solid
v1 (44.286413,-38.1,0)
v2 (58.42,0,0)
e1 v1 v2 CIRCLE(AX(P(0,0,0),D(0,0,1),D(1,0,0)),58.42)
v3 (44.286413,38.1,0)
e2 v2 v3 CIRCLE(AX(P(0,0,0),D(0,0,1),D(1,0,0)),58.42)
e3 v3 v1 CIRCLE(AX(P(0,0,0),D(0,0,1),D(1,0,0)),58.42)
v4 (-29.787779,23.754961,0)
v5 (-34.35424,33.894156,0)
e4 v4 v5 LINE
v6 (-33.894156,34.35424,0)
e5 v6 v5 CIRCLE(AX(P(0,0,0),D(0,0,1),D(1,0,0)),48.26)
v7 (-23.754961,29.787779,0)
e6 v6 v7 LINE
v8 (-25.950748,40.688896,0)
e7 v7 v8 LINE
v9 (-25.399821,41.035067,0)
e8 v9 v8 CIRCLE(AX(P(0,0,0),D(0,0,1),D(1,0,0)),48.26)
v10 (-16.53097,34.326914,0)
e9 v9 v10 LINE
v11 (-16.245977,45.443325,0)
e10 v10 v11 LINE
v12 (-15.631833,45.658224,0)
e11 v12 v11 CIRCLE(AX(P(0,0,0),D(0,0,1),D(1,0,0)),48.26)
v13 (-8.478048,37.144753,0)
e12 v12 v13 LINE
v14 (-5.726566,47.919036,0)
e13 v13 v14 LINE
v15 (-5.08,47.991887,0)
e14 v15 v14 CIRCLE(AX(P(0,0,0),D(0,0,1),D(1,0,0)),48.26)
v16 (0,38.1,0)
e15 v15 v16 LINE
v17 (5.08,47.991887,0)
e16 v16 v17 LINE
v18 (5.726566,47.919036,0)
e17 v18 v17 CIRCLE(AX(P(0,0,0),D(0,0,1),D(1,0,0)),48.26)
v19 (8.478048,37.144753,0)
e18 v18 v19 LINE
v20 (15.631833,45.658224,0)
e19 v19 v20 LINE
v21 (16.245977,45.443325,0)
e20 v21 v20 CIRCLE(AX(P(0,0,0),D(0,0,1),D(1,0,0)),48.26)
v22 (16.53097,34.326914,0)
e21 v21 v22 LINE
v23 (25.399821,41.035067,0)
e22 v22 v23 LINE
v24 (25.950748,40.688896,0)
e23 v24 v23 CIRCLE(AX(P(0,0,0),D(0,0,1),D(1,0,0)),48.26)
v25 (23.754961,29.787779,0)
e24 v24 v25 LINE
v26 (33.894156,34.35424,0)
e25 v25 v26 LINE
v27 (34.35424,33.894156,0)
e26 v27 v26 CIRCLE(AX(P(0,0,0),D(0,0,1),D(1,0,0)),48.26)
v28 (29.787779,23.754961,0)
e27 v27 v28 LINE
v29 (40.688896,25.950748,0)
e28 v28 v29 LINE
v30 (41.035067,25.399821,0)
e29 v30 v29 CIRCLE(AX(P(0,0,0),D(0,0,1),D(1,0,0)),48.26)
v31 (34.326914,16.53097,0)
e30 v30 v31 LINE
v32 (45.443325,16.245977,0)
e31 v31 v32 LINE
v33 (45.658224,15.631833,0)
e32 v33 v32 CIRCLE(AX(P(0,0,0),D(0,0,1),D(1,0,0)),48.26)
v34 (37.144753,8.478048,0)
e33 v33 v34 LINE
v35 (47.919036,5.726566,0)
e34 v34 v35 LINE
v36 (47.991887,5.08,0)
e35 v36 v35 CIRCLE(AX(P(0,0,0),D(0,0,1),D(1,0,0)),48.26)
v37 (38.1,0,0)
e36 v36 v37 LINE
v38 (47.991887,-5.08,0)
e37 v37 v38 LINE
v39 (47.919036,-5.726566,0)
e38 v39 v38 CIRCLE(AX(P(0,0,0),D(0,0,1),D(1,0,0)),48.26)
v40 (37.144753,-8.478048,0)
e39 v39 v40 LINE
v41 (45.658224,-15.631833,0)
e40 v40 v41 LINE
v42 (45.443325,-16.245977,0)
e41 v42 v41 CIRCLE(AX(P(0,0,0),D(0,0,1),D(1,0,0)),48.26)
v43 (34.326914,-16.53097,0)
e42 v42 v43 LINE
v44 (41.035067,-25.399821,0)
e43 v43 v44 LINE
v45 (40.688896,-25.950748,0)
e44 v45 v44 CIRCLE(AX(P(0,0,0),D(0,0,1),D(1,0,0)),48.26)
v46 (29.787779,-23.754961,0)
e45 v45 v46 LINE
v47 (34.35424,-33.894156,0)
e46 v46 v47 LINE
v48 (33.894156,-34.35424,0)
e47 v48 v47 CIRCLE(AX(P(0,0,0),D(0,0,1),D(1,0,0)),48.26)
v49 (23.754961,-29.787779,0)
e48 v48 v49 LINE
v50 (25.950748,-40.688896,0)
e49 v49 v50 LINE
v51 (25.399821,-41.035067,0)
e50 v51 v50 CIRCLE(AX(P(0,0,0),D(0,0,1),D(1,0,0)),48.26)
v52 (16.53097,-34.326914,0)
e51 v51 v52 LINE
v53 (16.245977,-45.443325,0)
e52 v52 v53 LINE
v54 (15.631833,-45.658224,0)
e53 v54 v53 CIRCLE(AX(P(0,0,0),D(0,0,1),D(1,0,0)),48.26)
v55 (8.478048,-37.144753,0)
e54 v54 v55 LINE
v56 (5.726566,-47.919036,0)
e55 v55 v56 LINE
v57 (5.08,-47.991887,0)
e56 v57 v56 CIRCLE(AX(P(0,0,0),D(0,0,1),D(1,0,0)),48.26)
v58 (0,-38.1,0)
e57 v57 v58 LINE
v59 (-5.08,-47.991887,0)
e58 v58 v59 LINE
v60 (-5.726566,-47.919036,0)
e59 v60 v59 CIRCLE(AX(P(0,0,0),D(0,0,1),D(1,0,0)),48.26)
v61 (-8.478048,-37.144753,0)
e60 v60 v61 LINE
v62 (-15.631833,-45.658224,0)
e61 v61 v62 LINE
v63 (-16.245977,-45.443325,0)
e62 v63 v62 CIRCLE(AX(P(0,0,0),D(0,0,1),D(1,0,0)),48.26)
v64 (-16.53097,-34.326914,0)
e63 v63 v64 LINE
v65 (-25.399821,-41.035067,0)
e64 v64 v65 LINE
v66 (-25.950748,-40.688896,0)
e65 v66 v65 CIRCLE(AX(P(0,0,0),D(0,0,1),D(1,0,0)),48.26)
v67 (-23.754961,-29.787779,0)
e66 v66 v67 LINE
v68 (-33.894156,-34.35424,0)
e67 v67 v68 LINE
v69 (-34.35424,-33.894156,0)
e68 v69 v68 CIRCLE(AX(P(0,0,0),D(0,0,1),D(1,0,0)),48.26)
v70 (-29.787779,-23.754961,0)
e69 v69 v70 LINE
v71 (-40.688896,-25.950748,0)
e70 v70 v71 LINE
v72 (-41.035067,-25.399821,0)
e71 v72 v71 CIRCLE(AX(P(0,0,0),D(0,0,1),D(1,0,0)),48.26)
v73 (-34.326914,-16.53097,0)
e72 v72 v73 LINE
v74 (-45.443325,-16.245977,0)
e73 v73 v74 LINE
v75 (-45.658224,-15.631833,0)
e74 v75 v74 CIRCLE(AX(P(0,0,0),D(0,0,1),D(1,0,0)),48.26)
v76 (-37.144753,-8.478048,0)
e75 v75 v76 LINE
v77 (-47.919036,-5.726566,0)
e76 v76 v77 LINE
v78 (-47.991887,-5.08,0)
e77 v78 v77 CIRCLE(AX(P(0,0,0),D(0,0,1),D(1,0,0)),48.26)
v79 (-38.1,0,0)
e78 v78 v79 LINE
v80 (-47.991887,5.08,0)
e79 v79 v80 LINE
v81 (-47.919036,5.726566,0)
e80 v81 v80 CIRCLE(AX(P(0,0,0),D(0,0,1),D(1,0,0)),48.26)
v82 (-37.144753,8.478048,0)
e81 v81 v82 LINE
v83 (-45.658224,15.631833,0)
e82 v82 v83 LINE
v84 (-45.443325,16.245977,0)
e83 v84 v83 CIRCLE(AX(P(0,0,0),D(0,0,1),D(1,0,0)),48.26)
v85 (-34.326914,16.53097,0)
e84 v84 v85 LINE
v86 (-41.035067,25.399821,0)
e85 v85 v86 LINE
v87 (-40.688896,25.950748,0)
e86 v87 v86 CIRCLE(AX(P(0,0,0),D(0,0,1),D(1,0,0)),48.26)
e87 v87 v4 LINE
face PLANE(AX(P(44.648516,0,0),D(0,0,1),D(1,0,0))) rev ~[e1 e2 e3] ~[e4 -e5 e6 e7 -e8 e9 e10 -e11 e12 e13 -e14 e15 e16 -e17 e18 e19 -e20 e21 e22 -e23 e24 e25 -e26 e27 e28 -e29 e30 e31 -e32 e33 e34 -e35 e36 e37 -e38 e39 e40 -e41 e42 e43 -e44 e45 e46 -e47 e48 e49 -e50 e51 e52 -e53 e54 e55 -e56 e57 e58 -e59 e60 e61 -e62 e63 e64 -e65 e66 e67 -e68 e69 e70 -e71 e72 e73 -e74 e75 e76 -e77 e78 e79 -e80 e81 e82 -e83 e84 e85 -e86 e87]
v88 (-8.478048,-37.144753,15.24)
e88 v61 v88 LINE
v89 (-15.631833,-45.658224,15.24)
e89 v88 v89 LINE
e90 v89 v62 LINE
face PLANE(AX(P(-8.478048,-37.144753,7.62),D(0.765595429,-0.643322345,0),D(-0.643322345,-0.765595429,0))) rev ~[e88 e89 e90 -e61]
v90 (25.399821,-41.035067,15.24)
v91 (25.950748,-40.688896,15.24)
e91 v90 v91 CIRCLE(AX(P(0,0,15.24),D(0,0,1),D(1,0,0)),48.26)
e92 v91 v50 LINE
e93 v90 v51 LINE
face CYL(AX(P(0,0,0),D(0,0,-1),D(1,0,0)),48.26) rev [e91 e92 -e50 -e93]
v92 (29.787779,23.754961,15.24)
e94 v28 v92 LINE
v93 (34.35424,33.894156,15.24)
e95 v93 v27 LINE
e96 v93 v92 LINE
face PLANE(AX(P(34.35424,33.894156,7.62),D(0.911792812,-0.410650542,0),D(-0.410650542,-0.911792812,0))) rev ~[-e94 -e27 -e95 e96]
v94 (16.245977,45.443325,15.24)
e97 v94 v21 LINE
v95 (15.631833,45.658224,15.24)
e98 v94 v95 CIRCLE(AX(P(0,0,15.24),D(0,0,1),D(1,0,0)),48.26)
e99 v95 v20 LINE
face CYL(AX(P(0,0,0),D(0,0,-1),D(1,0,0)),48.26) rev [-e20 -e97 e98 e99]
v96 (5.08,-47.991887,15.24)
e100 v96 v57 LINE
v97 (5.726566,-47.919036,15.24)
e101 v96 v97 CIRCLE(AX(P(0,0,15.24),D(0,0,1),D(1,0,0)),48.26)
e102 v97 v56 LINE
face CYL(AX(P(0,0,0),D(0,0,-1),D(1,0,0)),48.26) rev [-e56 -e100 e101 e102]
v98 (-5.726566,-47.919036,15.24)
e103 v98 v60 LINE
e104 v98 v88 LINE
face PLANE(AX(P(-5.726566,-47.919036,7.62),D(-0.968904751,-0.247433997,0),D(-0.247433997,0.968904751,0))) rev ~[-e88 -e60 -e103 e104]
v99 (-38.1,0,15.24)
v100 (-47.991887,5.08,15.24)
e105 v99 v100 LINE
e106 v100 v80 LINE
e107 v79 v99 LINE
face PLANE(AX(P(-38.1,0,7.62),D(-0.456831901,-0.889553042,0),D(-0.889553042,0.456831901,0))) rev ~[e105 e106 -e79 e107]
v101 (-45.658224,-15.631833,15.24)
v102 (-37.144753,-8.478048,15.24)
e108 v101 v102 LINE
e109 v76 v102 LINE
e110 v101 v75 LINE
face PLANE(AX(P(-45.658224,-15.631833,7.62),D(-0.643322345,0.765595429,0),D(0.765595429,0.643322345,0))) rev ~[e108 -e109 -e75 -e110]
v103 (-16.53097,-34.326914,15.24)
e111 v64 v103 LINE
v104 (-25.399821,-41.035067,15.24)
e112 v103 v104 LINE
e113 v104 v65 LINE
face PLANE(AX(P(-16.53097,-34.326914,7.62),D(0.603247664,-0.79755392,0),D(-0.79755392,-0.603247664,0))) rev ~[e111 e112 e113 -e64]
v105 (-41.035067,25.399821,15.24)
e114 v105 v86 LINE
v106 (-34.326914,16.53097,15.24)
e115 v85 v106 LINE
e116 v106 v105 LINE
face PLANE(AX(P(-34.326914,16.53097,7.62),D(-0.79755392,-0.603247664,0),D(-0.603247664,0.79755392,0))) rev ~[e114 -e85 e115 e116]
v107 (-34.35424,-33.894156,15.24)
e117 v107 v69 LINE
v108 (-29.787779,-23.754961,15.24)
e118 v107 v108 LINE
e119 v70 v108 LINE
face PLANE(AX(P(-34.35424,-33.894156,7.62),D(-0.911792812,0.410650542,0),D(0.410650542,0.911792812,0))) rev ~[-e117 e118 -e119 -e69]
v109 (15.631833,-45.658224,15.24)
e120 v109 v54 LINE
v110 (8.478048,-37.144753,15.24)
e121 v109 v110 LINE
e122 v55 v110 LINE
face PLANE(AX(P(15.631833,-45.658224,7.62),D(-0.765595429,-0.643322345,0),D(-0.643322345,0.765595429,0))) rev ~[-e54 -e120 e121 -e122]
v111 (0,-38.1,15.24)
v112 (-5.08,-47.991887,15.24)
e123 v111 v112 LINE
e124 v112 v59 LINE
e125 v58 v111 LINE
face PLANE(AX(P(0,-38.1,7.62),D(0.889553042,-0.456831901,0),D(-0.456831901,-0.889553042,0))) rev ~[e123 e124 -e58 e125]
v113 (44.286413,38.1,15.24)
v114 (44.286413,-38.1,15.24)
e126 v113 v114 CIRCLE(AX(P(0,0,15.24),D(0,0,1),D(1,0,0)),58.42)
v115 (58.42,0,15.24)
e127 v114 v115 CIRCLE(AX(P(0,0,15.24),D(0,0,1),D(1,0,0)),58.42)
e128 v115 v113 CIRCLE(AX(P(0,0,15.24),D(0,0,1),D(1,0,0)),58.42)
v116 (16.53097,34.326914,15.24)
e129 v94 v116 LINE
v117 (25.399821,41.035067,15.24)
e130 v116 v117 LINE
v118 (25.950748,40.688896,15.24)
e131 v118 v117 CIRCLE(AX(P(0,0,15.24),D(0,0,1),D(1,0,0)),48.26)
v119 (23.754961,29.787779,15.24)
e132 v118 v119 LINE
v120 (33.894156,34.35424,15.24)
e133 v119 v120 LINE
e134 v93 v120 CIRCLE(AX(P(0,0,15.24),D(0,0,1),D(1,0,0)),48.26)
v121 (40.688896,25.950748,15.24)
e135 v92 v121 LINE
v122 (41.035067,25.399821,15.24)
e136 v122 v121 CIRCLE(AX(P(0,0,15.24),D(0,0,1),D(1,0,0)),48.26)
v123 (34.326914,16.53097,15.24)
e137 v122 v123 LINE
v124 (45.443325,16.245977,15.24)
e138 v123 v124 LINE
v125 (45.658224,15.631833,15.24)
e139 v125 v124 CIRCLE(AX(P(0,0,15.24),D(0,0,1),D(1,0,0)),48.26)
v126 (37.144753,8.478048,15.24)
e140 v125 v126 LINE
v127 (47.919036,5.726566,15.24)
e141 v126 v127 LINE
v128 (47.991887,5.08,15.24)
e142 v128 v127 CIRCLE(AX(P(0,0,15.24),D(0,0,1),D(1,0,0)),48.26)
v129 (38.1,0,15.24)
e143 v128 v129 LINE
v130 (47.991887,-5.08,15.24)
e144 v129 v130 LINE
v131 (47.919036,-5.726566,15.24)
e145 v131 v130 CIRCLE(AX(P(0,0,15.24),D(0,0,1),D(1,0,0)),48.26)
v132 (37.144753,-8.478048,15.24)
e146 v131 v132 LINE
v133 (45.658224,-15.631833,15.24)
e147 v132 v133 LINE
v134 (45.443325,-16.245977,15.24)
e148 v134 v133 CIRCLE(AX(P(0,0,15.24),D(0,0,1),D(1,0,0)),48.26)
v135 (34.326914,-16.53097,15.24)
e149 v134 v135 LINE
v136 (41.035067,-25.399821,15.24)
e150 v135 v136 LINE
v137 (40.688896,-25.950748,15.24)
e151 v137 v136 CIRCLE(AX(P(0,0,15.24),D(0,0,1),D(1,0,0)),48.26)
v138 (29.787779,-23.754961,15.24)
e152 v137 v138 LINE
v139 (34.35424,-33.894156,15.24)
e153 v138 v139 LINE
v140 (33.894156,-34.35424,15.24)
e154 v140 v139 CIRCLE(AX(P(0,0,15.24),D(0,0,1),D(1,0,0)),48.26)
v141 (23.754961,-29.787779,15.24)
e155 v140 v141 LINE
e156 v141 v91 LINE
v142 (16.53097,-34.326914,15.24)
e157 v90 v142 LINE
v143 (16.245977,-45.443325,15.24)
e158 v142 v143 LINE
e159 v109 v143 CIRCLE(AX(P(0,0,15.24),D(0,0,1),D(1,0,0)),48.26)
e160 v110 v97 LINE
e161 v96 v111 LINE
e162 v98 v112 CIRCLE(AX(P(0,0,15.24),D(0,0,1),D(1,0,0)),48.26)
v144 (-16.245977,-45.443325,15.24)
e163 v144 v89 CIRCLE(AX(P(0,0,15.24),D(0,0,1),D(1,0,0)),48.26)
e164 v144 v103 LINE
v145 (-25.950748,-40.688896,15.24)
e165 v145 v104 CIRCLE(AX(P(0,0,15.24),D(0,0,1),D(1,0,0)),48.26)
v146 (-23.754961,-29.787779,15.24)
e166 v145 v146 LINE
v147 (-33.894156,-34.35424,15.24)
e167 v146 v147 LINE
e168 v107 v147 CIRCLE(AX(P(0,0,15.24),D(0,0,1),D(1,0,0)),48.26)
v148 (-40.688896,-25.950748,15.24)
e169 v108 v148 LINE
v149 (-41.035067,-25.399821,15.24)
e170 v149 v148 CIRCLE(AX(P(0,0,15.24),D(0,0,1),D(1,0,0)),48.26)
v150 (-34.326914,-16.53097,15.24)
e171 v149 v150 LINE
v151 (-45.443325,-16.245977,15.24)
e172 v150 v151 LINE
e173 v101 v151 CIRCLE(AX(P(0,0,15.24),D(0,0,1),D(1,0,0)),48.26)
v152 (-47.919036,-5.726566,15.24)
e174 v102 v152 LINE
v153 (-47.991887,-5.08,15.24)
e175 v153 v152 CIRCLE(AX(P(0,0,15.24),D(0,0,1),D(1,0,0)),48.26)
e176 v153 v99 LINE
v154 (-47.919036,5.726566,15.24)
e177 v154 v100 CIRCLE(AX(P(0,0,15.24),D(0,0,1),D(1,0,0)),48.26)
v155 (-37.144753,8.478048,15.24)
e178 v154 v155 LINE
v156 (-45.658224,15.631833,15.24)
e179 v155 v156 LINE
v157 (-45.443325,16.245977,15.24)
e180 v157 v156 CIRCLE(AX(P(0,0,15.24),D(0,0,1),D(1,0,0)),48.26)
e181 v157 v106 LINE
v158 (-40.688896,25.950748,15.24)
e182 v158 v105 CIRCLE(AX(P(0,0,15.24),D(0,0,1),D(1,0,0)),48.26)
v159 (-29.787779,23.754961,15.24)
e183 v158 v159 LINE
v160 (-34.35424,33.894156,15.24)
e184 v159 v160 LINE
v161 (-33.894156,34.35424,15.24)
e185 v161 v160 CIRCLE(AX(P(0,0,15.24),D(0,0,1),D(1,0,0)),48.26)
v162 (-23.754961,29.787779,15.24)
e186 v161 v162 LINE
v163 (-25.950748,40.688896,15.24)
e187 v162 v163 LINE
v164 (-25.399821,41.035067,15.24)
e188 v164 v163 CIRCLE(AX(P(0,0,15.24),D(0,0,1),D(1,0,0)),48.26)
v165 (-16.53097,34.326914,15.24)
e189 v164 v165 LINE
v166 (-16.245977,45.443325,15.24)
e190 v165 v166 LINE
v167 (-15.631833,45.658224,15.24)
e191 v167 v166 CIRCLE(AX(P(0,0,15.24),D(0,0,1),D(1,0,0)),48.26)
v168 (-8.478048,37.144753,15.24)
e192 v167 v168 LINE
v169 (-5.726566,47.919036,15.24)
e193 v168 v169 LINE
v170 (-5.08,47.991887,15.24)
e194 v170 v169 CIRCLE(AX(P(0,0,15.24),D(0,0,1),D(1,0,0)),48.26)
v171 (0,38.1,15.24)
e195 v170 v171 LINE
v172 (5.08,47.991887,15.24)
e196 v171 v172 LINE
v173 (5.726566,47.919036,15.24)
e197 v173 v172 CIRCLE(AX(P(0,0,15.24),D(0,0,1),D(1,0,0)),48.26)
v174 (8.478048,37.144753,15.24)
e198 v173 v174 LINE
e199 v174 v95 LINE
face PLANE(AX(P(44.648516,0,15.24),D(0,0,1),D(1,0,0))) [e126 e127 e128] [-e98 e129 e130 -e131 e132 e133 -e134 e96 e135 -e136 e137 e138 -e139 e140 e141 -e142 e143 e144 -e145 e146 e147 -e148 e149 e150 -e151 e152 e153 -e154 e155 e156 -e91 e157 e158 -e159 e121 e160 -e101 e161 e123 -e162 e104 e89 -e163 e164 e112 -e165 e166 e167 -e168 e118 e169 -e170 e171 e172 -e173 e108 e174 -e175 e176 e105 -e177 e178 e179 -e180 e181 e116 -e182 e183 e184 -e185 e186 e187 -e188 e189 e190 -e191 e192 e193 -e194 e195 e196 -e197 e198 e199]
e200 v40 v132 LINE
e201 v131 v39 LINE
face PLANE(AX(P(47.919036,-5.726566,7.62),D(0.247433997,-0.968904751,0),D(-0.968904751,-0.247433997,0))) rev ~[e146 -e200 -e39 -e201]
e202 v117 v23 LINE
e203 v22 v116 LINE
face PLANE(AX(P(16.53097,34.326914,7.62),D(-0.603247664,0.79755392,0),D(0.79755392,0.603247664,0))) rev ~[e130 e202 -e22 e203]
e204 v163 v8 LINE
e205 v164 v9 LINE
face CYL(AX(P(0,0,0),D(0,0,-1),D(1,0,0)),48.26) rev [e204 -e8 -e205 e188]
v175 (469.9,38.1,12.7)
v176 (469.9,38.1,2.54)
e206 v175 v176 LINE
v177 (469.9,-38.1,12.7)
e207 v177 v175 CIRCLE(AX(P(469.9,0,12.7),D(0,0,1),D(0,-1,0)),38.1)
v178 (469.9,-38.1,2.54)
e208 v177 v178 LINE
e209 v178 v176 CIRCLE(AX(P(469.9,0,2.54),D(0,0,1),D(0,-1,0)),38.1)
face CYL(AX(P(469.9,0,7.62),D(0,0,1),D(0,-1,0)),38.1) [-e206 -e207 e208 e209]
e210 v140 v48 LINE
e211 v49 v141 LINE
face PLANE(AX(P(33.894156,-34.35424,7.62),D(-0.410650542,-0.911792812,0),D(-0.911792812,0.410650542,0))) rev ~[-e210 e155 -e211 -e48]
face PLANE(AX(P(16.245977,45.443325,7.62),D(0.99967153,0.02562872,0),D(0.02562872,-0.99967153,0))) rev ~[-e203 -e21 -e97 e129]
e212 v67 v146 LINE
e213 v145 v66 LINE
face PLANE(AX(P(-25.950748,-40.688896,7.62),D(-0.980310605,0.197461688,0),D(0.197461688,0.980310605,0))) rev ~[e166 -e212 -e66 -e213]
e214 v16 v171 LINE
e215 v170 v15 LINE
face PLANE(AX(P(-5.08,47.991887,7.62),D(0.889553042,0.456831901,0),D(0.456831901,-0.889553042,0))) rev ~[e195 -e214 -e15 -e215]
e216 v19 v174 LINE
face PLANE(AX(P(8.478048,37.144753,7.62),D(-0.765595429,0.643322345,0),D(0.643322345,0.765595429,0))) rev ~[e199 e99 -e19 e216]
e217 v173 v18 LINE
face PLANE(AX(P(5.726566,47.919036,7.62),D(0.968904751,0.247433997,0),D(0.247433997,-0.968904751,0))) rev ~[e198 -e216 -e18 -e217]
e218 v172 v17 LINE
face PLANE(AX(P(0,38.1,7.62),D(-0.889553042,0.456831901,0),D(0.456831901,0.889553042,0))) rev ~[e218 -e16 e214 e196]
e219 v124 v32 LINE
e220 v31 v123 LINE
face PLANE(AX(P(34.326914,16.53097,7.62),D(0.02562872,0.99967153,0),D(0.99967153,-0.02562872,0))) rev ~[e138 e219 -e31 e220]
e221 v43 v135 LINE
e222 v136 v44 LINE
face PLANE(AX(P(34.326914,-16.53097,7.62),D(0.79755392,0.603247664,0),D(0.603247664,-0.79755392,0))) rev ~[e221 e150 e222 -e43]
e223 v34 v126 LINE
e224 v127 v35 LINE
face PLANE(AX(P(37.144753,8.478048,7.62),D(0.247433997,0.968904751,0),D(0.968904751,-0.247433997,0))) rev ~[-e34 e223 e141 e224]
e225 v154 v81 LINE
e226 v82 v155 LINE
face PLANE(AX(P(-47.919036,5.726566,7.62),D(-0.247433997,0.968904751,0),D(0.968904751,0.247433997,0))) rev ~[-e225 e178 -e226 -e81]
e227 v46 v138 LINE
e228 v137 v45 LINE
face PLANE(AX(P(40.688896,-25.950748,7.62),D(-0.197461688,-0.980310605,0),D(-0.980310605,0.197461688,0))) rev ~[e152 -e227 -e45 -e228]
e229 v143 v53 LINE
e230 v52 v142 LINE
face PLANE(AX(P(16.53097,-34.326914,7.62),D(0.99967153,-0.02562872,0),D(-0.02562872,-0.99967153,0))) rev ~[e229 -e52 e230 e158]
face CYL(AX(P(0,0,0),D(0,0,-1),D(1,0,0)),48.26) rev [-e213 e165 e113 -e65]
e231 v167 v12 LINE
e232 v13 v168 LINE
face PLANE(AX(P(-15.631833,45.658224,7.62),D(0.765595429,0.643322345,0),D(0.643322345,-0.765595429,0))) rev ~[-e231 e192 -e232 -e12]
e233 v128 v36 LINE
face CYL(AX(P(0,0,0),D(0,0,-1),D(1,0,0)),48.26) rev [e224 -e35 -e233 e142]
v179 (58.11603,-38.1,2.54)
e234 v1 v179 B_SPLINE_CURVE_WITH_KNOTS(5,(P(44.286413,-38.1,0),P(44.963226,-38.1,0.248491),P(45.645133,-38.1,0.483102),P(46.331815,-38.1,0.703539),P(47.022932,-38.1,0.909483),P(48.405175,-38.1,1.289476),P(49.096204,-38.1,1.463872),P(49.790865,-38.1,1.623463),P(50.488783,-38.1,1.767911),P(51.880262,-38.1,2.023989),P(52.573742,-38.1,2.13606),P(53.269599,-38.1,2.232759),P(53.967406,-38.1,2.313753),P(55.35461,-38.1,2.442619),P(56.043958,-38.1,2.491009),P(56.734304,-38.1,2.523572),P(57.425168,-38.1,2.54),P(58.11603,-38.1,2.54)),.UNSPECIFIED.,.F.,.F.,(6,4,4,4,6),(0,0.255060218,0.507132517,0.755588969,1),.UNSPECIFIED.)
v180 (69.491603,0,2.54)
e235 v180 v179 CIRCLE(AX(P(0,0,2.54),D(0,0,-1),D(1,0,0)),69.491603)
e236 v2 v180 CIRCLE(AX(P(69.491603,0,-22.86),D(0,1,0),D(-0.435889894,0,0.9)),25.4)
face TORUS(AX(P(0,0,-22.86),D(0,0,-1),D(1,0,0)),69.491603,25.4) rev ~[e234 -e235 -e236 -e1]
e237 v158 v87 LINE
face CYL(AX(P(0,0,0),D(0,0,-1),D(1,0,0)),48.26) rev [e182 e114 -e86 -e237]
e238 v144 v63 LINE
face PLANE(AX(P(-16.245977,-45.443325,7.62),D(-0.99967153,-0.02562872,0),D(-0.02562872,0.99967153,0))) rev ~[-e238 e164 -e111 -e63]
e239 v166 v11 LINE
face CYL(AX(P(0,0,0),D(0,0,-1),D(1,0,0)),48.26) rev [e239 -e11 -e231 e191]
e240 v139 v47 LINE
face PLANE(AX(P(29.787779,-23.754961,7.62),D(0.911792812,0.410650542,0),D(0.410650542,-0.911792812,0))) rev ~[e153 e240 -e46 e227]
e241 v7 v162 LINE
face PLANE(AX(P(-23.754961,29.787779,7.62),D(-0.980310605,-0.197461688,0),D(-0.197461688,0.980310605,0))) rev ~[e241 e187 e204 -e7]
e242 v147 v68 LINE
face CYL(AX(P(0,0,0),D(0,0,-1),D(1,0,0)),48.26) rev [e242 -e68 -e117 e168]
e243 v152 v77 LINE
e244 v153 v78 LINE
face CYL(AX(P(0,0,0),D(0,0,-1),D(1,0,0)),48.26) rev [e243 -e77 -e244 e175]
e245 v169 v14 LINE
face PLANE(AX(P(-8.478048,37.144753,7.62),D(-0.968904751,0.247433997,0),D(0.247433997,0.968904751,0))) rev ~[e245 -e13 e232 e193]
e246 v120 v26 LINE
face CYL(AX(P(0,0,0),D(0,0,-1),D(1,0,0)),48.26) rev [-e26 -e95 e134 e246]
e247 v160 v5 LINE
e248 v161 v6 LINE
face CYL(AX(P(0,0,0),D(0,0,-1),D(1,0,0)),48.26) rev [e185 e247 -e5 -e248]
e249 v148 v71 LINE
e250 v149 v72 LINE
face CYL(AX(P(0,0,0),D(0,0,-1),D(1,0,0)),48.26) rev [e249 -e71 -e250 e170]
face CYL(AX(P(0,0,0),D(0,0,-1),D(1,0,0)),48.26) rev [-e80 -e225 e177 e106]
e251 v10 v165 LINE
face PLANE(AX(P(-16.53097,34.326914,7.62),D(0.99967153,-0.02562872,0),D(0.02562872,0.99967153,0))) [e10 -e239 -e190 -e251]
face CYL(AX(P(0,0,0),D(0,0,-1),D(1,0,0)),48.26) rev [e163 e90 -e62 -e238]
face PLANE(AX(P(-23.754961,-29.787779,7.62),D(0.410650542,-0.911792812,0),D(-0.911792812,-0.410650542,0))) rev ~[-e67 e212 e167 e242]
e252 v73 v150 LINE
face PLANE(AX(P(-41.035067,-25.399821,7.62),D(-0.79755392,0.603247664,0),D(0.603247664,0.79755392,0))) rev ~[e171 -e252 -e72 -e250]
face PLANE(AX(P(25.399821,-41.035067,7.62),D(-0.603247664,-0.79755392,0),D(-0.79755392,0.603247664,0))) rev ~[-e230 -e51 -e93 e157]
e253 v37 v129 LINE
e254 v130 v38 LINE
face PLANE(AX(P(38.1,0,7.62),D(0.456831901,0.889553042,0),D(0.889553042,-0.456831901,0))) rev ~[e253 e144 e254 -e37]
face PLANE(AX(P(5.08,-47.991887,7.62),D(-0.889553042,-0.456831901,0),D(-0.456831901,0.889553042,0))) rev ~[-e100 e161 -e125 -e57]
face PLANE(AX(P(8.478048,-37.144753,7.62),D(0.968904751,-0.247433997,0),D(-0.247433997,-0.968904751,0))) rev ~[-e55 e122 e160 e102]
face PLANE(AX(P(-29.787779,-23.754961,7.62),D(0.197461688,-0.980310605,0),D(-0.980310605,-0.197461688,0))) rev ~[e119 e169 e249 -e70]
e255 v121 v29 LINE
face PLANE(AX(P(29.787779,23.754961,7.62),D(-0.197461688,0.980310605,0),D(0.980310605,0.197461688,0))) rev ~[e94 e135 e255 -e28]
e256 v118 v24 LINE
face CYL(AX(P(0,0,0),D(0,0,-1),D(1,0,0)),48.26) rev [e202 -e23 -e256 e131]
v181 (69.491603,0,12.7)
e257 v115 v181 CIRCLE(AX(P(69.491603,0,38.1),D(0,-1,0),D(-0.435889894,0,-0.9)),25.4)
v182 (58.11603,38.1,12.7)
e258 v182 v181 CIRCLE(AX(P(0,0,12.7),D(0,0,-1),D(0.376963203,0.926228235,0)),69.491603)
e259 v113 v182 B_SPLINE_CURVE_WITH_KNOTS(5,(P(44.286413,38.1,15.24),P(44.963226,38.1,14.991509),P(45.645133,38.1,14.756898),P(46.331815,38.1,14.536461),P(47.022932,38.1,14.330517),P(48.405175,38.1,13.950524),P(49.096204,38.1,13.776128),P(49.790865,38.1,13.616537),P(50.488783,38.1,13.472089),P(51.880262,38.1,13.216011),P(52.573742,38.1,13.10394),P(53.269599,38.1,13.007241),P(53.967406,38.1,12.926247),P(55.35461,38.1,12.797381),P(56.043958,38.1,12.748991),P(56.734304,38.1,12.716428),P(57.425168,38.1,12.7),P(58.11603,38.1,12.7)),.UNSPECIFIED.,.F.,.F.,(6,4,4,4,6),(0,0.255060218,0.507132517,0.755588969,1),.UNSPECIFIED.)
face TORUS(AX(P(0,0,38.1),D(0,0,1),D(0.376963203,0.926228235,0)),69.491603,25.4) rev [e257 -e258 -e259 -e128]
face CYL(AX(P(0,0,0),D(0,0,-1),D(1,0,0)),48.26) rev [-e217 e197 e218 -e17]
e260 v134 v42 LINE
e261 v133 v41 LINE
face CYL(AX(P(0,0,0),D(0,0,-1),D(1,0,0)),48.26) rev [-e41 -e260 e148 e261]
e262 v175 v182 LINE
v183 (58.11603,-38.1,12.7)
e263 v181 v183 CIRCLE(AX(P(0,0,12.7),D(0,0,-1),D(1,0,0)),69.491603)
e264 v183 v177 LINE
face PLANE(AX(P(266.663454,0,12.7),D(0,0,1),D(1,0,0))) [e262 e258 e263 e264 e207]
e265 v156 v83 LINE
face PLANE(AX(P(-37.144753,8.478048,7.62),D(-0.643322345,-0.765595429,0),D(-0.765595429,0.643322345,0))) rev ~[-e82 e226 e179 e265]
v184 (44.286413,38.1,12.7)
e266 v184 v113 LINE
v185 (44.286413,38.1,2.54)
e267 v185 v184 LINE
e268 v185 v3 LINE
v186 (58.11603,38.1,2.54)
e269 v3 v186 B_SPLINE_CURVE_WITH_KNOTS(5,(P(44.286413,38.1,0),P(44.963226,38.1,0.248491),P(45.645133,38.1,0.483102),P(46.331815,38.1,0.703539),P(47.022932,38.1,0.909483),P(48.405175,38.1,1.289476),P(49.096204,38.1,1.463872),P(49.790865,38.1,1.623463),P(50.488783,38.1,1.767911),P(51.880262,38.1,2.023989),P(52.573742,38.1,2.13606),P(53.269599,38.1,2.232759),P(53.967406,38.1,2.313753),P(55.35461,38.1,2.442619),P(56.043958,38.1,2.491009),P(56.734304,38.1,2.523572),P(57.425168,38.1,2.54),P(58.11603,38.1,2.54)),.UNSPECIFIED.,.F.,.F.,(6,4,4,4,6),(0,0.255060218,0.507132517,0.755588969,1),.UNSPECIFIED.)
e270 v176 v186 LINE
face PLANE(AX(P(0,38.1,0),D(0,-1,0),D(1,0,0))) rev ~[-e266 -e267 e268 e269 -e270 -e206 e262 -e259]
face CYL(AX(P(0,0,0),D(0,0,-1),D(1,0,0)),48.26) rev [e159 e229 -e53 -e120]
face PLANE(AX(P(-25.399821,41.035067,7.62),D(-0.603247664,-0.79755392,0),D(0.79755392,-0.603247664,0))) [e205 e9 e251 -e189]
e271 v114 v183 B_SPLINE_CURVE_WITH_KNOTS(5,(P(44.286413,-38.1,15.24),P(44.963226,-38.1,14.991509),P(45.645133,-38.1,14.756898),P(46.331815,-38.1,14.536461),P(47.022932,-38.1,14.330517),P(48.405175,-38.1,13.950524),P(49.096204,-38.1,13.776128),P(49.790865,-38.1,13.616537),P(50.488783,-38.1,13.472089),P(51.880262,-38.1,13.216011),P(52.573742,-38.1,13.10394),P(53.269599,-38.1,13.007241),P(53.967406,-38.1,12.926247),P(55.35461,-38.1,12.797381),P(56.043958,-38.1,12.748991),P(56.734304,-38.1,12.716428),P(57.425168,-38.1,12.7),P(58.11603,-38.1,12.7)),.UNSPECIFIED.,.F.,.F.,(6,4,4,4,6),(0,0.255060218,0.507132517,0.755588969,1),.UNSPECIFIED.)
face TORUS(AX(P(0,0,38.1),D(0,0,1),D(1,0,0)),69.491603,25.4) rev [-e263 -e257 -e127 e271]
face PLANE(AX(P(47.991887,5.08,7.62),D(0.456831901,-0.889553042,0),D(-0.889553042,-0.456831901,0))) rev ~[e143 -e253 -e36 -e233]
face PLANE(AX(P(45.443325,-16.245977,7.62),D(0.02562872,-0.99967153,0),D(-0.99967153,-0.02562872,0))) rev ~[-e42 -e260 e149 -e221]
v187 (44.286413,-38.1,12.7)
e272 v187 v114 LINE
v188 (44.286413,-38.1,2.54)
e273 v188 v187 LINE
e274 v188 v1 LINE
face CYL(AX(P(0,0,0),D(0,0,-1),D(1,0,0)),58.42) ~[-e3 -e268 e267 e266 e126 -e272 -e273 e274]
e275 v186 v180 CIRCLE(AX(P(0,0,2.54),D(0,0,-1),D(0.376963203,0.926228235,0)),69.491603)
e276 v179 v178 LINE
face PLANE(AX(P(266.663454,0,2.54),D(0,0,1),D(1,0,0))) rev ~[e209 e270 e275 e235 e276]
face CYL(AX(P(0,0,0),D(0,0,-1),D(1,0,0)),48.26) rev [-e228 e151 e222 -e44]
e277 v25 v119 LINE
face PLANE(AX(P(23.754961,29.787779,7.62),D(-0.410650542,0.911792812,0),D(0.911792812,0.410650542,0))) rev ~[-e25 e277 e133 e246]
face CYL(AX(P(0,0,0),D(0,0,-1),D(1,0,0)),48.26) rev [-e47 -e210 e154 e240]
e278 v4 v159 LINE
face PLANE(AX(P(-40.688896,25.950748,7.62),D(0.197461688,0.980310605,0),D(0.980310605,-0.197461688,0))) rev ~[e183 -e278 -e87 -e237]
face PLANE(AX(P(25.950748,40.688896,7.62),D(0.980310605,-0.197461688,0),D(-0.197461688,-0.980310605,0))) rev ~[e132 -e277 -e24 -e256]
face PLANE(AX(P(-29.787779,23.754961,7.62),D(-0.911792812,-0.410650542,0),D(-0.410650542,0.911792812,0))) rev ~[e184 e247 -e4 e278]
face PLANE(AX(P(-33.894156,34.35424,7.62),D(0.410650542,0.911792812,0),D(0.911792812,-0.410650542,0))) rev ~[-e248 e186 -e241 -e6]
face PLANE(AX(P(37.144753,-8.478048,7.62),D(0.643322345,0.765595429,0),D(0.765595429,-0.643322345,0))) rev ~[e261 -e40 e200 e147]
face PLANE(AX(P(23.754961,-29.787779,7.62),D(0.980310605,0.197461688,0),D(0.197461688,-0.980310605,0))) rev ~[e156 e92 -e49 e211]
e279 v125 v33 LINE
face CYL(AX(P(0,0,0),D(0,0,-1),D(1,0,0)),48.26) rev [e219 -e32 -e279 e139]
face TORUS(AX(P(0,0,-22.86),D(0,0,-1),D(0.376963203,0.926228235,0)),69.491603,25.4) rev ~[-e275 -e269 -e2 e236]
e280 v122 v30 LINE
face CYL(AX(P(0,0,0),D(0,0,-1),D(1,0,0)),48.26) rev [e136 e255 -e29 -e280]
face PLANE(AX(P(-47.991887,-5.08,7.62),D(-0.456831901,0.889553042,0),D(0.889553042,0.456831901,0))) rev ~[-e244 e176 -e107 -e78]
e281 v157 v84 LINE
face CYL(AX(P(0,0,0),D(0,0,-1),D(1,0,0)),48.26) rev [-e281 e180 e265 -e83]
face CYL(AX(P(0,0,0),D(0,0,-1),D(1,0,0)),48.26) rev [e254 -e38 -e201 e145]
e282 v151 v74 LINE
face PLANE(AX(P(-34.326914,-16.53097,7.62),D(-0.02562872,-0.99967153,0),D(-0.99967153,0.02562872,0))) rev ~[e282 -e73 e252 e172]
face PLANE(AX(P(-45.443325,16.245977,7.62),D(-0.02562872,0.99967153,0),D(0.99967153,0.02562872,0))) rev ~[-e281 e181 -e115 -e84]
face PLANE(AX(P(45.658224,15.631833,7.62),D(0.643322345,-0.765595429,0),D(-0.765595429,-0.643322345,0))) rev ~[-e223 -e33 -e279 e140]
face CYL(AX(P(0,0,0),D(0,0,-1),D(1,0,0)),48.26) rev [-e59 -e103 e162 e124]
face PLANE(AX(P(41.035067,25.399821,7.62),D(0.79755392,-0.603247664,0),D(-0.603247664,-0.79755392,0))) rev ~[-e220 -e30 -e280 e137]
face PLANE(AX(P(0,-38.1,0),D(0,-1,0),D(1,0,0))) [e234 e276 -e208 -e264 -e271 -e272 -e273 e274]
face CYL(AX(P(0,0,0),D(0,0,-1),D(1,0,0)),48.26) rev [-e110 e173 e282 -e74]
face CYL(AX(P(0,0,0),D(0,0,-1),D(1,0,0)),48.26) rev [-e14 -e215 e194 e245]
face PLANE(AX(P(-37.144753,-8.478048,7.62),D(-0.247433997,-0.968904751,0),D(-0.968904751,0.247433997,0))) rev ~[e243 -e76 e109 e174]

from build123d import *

# Parameters (mm, degrees)
F0_R         = 58.42
F0_R_2       = 48.26
F1_DEPTH     = 15.24
F4_DEPTH     = 5.08
F6_DEPTH     = 7.62
F7_T4_ANGLE  = 67.8542971522
F7_T9_ANGLE  = 67.8542971522
F7_T14_ANGLE = 67.8542971522
F7_T19_ANGLE = 67.8542971522


# Not quite as in the source:
# - a fillet or chamfer that OpenCascade refuses, or shapes differently, is made with other operations: its cross-section is extruded or revolved along the edge and cut away or added


with BuildPart() as f1:
    # F0 (on Top) → F1 (new body)
    with BuildSketch(Plane.XY):
        Circle(F0_R)
        Circle(F0_R_2, mode=Mode.SUBTRACT)
    extrude(amount=F1_DEPTH)

    # F3 (on offset) → F4 (join, symmetric)
    with BuildSketch(Plane.XY.offset(7.62)):
        with BuildLine():
            Line((469.9, 38.1), (44.2864132664, 38.1))
            ThreePointArc((44.2864132664, 38.1), (58.3891573479, 0), (44.2864132664, -38.1))
            Line((44.2864132664, -38.1), (469.9, -38.1))
            ThreePointArc((469.9, -38.1), (508, 0), (469.9, 38.1))
        make_face()
    extrude(amount=F4_DEPTH, both=True)

    # F5 (on offset) → F6 (join, symmetric)
    with BuildSketch(Plane.XY.offset(7.62)):
        with BuildLine():
            Line((-15.6318332701, 45.6582236691), (-8.4780475837, 37.1447534541))
            Line((-8.4780475837, 37.1447534541), (-5.7265656824, 47.9190363581))
            ThreePointArc((-5.7265656824, 47.9190363581), (-10.7388602727, 47.0500210419), (-15.6318332701, 45.6582236691))
        make_face()
        with BuildLine():
            Line((-5.08, 47.9918868143), (0, 38.1))
            Line((0, 38.1), (5.08, 47.9918868143))
            ThreePointArc((5.08, 47.9918868143), (0, 48.26), (-5.08, 47.9918868143))
        make_face()
        with BuildLine():
            Line((5.7265656824, 47.9190363581), (8.4780475837, 37.1447534541))
            Line((8.4780475837, 37.1447534541), (15.6318332701, 45.6582236691))
            ThreePointArc((15.6318332701, 45.6582236691), (10.7388602727, 47.0500210419), (5.7265656824, 47.9190363581))
        make_face()
        with BuildLine():
            Line((16.2459774494, 45.4433253263), (16.5309704604, 34.3269138671))
            Line((16.5309704604, 34.3269138671), (25.3998211473, 41.0350665369))
            ThreePointArc((25.3998211473, 41.0350665369), (20.9392292498, 43.480757565), (16.2459774494, 45.4433253263))
        make_face()
        with BuildLine():
            Line((25.9507480698, 40.6888962079), (23.7549614508, 29.787779482))
            Line((23.7549614508, 29.787779482), (33.8941559316, 34.354239821))
            ThreePointArc((33.8941559316, 34.354239821), (30.0896178377, 37.7311873439), (25.9507480698, 40.6888962079))
        make_face()
        with BuildLine():
            Line((34.354239821, 33.8941559316), (29.787779482, 23.7549614508))
            Line((29.787779482, 23.7549614508), (40.6888962079, 25.9507480698))
            ThreePointArc((40.6888962079, 25.9507480698), (37.7311873439, 30.0896178377), (34.354239821, 33.8941559316))
        make_face()
        with BuildLine():
            Line((41.0350665369, 25.3998211473), (34.3269138671, 16.5309704604))
            Line((34.3269138671, 16.5309704604), (45.4433253263, 16.2459774494))
            ThreePointArc((45.4433253263, 16.2459774494), (43.480757565, 20.9392292498), (41.0350665369, 25.3998211473))
        make_face()
        with BuildLine():
            Line((45.6582236691, 15.6318332701), (37.1447534541, 8.4780475837))
            Line((37.1447534541, 8.4780475837), (47.9190363581, 5.7265656824))
            ThreePointArc((47.9190363581, 5.7265656824), (47.0500210419, 10.7388602727), (45.6582236691, 15.6318332701))
        make_face()
        with BuildLine():
            Line((47.9918868143, 5.08), (38.1, 0))
            Line((38.1, 0), (47.9918868143, -5.08))
            ThreePointArc((47.9918868143, -5.08), (48.26, 0), (47.9918868143, 5.08))
        make_face()
        with BuildLine():
            Line((47.9190363581, -5.7265656824), (37.1447534541, -8.4780475837))
            Line((37.1447534541, -8.4780475837), (45.6582236691, -15.6318332701))
            ThreePointArc((45.6582236691, -15.6318332701), (47.0500210419, -10.7388602727), (47.9190363581, -5.7265656824))
        make_face()
        with BuildLine():
            Line((45.4433253263, -16.2459774494), (34.3269138671, -16.5309704604))
            Line((34.3269138671, -16.5309704604), (41.0350665369, -25.3998211473))
            ThreePointArc((41.0350665369, -25.3998211473), (43.480757565, -20.9392292498), (45.4433253263, -16.2459774494))
        make_face()
        with BuildLine():
            Line((40.6888962079, -25.9507480698), (29.787779482, -23.7549614508))
            Line((29.787779482, -23.7549614508), (34.354239821, -33.8941559316))
            ThreePointArc((34.354239821, -33.8941559316), (37.7311873439, -30.0896178377), (40.6888962079, -25.9507480698))
        make_face()
        with BuildLine():
            Line((25.3998211473, -41.0350665369), (16.5309704604, -34.3269138671))
            Line((16.5309704604, -34.3269138671), (16.2459774494, -45.4433253263))
            ThreePointArc((16.2459774494, -45.4433253263), (20.9392292498, -43.480757565), (25.3998211473, -41.0350665369))
        make_face()
        with BuildLine():
            Line((15.6318332701, -45.6582236691), (8.4780475837, -37.1447534541))
            Line((8.4780475837, -37.1447534541), (5.7265656824, -47.9190363581))
            ThreePointArc((5.7265656824, -47.9190363581), (10.7388602727, -47.0500210419), (15.6318332701, -45.6582236691))
        make_face()
        with BuildLine():
            Line((5.08, -47.9918868143), (0, -38.1))
            Line((0, -38.1), (-5.08, -47.9918868143))
            ThreePointArc((-5.08, -47.9918868143), (0, -48.26), (5.08, -47.9918868143))
        make_face()
        with BuildLine():
            Line((33.8941559316, -34.354239821), (23.7549614508, -29.787779482))
            Line((23.7549614508, -29.787779482), (25.9507480698, -40.6888962079))
            ThreePointArc((25.9507480698, -40.6888962079), (30.0896178377, -37.7311873439), (33.8941559316, -34.354239821))
        make_face()
        with BuildLine():
            Line((-5.7265656824, -47.9190363581), (-8.4780475837, -37.1447534541))
            Line((-8.4780475837, -37.1447534541), (-15.6318332701, -45.6582236691))
            ThreePointArc((-15.6318332701, -45.6582236691), (-10.7388602727, -47.0500210419), (-5.7265656824, -47.9190363581))
        make_face()
        with BuildLine():
            Line((-16.2459774494, -45.4433253263), (-16.5309704604, -34.3269138671))
            Line((-16.5309704604, -34.3269138671), (-25.3998211473, -41.0350665369))
            ThreePointArc((-25.3998211473, -41.0350665369), (-20.9392292498, -43.480757565), (-16.2459774494, -45.4433253263))
        make_face()
        with BuildLine():
            Line((-25.9507480698, -40.6888962079), (-23.7549614508, -29.787779482))
            Line((-23.7549614508, -29.787779482), (-33.8941559316, -34.354239821))
            ThreePointArc((-33.8941559316, -34.354239821), (-30.0896178377, -37.7311873439), (-25.9507480698, -40.6888962079))
        make_face()
        with BuildLine():
            Line((-34.354239821, -33.8941559316), (-29.787779482, -23.7549614508))
            Line((-29.787779482, -23.7549614508), (-40.6888962079, -25.9507480698))
            ThreePointArc((-40.6888962079, -25.9507480698), (-37.7311873439, -30.0896178377), (-34.354239821, -33.8941559316))
        make_face()
        with BuildLine():
            Line((-41.0350665369, -25.3998211473), (-34.3269138671, -16.5309704604))
            Line((-34.3269138671, -16.5309704604), (-45.4433253263, -16.2459774494))
            ThreePointArc((-45.4433253263, -16.2459774494), (-43.480757565, -20.9392292498), (-41.0350665369, -25.3998211473))
        make_face()
        with BuildLine():
            Line((-45.6582236691, -15.6318332701), (-37.1447534541, -8.4780475837))
            Line((-37.1447534541, -8.4780475837), (-47.9190363581, -5.7265656824))
            ThreePointArc((-47.9190363581, -5.7265656824), (-47.0500210419, -10.7388602727), (-45.6582236691, -15.6318332701))
        make_face()
        with BuildLine():
            Line((-47.9918868143, -5.08), (-38.1, 0))
            Line((-38.1, 0), (-47.9918868143, 5.08))
            ThreePointArc((-47.9918868143, 5.08), (-48.26, 0), (-47.9918868143, -5.08))
        make_face()
        with BuildLine():
            Line((-47.9190363581, 5.7265656824), (-37.1447534541, 8.4780475837))
            Line((-37.1447534541, 8.4780475837), (-45.6582236691, 15.6318332701))
            ThreePointArc((-45.6582236691, 15.6318332701), (-47.0500210419, 10.7388602727), (-47.9190363581, 5.7265656824))
        make_face()
        with BuildLine():
            Line((-45.4433253263, 16.2459774494), (-34.3269138671, 16.5309704604))
            Line((-34.3269138671, 16.5309704604), (-41.0350665369, 25.3998211473))
            ThreePointArc((-41.0350665369, 25.3998211473), (-43.480757565, 20.9392292498), (-45.4433253263, 16.2459774494))
        make_face()
        with BuildLine():
            Line((-40.6888962079, 25.9507480698), (-29.787779482, 23.7549614508))
            Line((-29.787779482, 23.7549614508), (-34.354239821, 33.8941559316))
            ThreePointArc((-34.354239821, 33.8941559316), (-37.7311873439, 30.0896178377), (-40.6888962079, 25.9507480698))
        make_face()
        with BuildLine():
            Line((-33.8941559316, 34.354239821), (-23.7549614508, 29.787779482))
            Line((-23.7549614508, 29.787779482), (-25.9507480698, 40.6888962079))
            ThreePointArc((-25.9507480698, 40.6888962079), (-30.0896178377, 37.7311873439), (-33.8941559316, 34.354239821))
        make_face()
        with BuildLine():
            Line((-25.3998211473, 41.0350665369), (-16.5309704604, 34.3269138671))
            Line((-16.5309704604, 34.3269138671), (-16.2459774494, 45.4433253263))
            ThreePointArc((-16.2459774494, 45.4433253263), (-20.9392292498, 43.480757565), (-25.3998211473, 41.0350665369))
        make_face()
    extrude(amount=F6_DEPTH, both=True)

    # F7: fillet of radius 25.4 on 4 edges, made by hand


with BuildPart() as f7_tool2:
    # F7_s3 → F7_t4 (revolve)
    with BuildSketch(Plane.XZ):
        with BuildLine():
            ThreePointArc((58.42, 15.24), (63.8119906537, 13.3431423642), (69.4916033166, 12.7))
            Line((69.4916033166, 12.7), (58.42, 12.7))
            Line((58.42, 12.7), (58.42, 15.24))
        make_face()
    revolve(axis=Axis((0, 0, 12.7), (0, 0, -1)), revolution_arc=F7_T4_ANGLE)

    split(bisect_by=Plane.XZ.offset(38.1), keep=Keep.BOTTOM)


with BuildPart() as f1_1:
    add(f1.part)

    # F7_t1: union F7_tool2
    add(f7_tool2.part)


with BuildPart() as f7_tool7:
    # F7_s8 → F7_t9 (revolve)
    with BuildSketch(Plane(origin=(0, 0, 0), x_dir=(0, 0, 1), z_dir=(-0.9262282352, 0.376963203, 0))):
        with BuildLine():
            ThreePointArc((15.24, 58.42), (13.3431423642, 63.8119906537), (12.7, 69.4916033166))
            Line((12.7, 69.4916033166), (12.7, 58.42))
            Line((12.7, 58.42), (15.24, 58.42))
        make_face()
    revolve(axis=Axis((0, 0, 12.7), (0, 0, -1)), revolution_arc=F7_T9_ANGLE)

    split(bisect_by=Plane.XZ.offset(-38.1), keep=Keep.TOP)


with BuildPart() as f1_2:
    add(f1_1.part)

    # F7_t6: union F7_tool7
    add(f7_tool7.part)


with BuildPart() as f7_tool12:
    # F7_s13 → F7_t14 (revolve)
    with BuildSketch(Plane.XZ):
        with BuildLine():
            ThreePointArc((58.42, 0), (63.8119906537, 1.8968576358), (69.4916033166, 2.54))
            Line((69.4916033166, 2.54), (58.42, 2.54))
            Line((58.42, 2.54), (58.42, 0))
        make_face()
    revolve(axis=Axis((0, 0, 2.54), (0, 0, -1)), revolution_arc=F7_T14_ANGLE)

    split(bisect_by=Plane.XZ.offset(38.1), keep=Keep.BOTTOM)


with BuildPart() as f1_3:
    add(f1_2.part)

    # F7_t11: union F7_tool12
    add(f7_tool12.part)


with BuildPart() as f7_tool17:
    # F7_s18 → F7_t19 (revolve)
    with BuildSketch(Plane(origin=(0, 0, 0), x_dir=(0, 0, 1), z_dir=(-0.9262282352, 0.376963203, 0))):
        with BuildLine():
            ThreePointArc((0, 58.42), (1.8968576358, 63.8119906537), (2.54, 69.4916033166))
            Line((2.54, 69.4916033166), (2.54, 58.42))
            Line((2.54, 58.42), (0, 58.42))
        make_face()
    revolve(axis=Axis((0, 0, 2.54), (0, 0, -1)), revolution_arc=F7_T19_ANGLE)

    split(bisect_by=Plane.XZ.offset(-38.1), keep=Keep.TOP)


with BuildPart() as f1_4:
    add(f1_3.part)

    # F7_t16: union F7_tool17
    add(f7_tool17.part)


solid = f1_4.part
